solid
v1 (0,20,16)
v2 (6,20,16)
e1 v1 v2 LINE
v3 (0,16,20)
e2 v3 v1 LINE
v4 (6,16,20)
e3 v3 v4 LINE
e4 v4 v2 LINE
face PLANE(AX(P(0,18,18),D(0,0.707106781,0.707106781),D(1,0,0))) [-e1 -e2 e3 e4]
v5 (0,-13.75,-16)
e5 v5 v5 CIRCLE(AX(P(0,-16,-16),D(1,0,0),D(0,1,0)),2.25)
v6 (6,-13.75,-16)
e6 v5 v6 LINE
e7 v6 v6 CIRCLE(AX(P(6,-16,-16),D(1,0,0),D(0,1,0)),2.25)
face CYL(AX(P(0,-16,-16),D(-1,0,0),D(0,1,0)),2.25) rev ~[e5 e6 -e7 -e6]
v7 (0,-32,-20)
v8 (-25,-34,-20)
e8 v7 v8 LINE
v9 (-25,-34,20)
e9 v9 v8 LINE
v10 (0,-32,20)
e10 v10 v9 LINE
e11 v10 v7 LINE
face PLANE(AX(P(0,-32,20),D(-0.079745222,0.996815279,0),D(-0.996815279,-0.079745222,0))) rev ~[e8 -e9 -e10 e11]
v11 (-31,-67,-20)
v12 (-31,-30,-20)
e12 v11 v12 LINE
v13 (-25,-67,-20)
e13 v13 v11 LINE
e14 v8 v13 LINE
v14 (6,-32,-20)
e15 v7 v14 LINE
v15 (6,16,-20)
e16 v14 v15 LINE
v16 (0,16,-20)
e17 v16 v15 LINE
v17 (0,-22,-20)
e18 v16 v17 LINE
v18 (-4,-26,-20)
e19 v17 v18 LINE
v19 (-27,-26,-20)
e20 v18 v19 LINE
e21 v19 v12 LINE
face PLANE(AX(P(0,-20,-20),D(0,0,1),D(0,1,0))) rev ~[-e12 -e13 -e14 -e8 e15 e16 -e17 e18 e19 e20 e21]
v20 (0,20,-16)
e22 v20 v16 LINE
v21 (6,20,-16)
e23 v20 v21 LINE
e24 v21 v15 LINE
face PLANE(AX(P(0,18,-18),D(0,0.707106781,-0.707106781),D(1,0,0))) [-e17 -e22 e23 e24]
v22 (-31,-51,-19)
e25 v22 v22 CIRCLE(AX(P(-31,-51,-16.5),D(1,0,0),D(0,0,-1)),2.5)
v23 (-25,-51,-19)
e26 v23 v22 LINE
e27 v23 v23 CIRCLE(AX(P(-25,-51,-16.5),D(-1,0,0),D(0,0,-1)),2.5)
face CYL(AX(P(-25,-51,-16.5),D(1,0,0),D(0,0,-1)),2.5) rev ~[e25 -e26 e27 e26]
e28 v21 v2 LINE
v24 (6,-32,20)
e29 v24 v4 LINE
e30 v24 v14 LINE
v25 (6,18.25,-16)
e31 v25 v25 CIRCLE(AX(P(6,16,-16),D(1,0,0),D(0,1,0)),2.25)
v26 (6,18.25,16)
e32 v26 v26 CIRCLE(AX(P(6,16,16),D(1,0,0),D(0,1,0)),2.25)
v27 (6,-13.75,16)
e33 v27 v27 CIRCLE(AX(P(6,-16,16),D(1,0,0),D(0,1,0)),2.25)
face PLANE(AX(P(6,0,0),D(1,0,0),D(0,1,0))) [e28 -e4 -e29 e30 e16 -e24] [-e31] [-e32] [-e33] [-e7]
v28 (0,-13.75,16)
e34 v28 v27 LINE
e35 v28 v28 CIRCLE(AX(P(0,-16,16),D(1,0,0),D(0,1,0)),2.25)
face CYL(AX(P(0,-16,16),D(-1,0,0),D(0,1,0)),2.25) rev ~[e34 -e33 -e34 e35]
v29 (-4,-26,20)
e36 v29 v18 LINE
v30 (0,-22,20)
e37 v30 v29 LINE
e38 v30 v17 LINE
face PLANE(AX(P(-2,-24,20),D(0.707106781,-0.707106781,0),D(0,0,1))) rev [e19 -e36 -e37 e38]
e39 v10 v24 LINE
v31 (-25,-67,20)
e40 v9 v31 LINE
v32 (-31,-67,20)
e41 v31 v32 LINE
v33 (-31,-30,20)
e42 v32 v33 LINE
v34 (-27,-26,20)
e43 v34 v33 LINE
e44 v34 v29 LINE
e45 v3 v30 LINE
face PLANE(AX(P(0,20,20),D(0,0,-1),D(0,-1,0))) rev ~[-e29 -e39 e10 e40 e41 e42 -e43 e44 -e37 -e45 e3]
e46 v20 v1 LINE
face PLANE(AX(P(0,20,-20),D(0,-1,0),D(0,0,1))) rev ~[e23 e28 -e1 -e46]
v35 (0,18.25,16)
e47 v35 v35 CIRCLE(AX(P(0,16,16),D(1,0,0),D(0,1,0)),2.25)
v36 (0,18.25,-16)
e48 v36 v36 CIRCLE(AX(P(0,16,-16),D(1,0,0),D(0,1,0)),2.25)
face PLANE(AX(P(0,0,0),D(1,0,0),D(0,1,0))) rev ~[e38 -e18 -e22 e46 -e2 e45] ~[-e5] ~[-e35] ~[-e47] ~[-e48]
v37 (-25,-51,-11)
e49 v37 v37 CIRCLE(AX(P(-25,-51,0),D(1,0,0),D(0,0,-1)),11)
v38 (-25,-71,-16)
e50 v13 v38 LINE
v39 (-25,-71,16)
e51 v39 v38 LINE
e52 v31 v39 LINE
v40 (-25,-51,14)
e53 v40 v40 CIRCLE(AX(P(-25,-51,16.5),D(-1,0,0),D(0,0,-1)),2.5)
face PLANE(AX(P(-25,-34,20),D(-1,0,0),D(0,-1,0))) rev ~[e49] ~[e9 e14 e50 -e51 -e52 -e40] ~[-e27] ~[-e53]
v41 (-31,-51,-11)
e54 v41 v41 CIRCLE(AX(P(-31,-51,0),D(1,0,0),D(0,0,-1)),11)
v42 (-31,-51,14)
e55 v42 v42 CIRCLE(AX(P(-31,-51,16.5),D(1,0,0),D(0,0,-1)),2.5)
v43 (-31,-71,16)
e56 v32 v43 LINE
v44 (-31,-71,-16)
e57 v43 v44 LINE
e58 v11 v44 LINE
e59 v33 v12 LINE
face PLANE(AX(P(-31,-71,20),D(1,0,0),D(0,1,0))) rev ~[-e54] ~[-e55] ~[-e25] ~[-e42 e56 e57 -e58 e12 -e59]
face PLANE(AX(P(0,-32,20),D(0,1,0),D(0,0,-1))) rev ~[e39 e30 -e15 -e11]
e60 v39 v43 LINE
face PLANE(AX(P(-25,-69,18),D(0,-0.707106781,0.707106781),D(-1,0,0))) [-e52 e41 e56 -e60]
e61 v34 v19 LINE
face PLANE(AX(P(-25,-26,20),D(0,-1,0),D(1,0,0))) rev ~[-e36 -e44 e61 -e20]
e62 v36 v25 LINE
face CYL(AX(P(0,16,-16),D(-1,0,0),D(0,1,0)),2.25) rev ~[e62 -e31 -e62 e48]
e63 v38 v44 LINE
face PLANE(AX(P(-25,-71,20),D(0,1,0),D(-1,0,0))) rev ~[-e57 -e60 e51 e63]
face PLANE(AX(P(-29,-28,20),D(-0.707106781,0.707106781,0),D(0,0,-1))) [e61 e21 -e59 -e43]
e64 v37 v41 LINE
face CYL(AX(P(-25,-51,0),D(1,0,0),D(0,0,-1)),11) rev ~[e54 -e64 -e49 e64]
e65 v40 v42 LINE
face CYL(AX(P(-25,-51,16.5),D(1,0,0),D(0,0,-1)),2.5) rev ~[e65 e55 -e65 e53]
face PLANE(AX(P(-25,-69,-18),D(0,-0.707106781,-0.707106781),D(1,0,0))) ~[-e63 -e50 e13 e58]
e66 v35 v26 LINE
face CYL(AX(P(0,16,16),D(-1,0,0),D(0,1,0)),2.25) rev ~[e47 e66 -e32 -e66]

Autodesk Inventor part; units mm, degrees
ref_plane "YZ Plane" through (0, 0, 0) normal (1, 0, 0) x (0, 1, 0)
ref_plane "XZ Plane" through (0, 0, 0) normal (0, 1, 0) x (-1, 0, 0)
ref_plane "XY Plane" through (0, 0, 0) normal (0, 0, 1) x (1, 0, 0)
sketch "Skizze1" plane through (0, 0, 0) normal (1, 0, 0) x (0, 1, 0)
  line L0 (-20, -20) -> (20, -20)
  line L1 (20, -20) -> (20, 20)
  line L2 (20, 20) -> (-20, 20)
  line L3 (-20, 20) -> (-20, -20)
  line L4 (-20, -20) -> (20, 20) construction
  line L5 (20, -20) -> (-20, 20) construction
  line L6 (-16, -16) -> (16, -16) construction
  line L7 (16, -16) -> (16, 16) construction
  line L8 (16, 16) -> (-16, 16) construction
  line L9 (-16, 16) -> (-16, -16) construction
  line L10 (-16, -16) -> (16, 16) construction
  line L11 (16, -16) -> (-16, 16) construction
  circle A0 centre (16, 16) radius 2.25
  circle A1 centre (16, -16) radius 2.25
  circle A2 centre (-16, -16) radius 2.25
  circle A3 centre (-16, 16) radius 2.25
  line L12 (-20, 20) -> (-32, 20)
  line L13 (-32, 20) -> (-32, -20)
  line L14 (-32, -20) -> (-20, -20)
  line L15 (-20, -20) -> (-20, 20)
  point P0 (0, 0)
  dimension "d0" = 40
  dimension "d1" = 40
  dimension "d2" = 32
  dimension "d3" = 32
  dimension "d4" = 4.5
  dimension "d5" = 4.5
  dimension "d6" = 4.5
  dimension "d7" = 4.5
  dimension "d8" = 12
extrude "Extrusion1" add sketch "Skizze1" along normal blind 6
ref_plane "Arbeitsebene1" through (0, -32, 20) normal (0, 0, 1) x (1, 0, 0)
sketch "Skizze2" plane through (0, -32, 20) normal (0, 0, 1) x (1, 0, 0)
  line L0 (0, 52) -> (0, 0) projected
  line L1 (0, 0) -> (6, 0) projected
  line L2 (6, 52) -> (6, 0) projected
  line L3 (0, 52) -> (6, 52) projected
  line L4 (-31, 6) -> (-25, 6)
  line L5 (-25, 6) -> (-25, -39)
  line L6 (-25, -39) -> (-31, -39)
  line L7 (-31, -39) -> (-31, 6)
  line L8 (0, 0) -> (-25, -2)
  line L9 (-25, 6) -> (0, 6)
  point P0 (0, 32)
  point P1 (-28, -39)
  point P2 (-28, 6)
  dimension "d12" = 6
  dimension "d13" = 45
  dimension "d14" = 6
  dimension "d15" = 25
  dimension "d16" = 8
extrude "Extrusion2" add sketch "Skizze2" against normal up to surface (40 mm away) contours L0 L8 L5 L9 | L5 L6 L7 L4
chamfer "Fasen1" distance 4 angle 45 6 edges at (-31, -26, 0) (0, -26, 0) (-28, -71, -20) (-28, -71, 20) (3, 20, -20) (3, 20, 20)
sketch "Skizze3" plane through (-25, -34, 20) normal (1, 0, 0) x (0, 0, -1)
  line L0 (4, -37) -> (0, -33) projected
  line L1 (4, -37) -> (36, -37) projected
  line L2 (40, -33) -> (36, -37) projected
  line L3 (40, 0) -> (40, -33) projected
  line L4 (0, 0) -> (40, 0) projected
  line L5 (0, -33) -> (0, 0) projected
  circle A0 centre (20, -17) radius 20
  circle A1 centre (20, -17) radius 16.5
  point P0 (20, 34)
  dimension "d22" = 33
extrude "Extrusion3" cut sketch "Skizze3" along normal through all contours A1
sketch "Skizze4" plane through (-25, -67, 20) normal (1, 0, 0) x (0, 0, -1)
  line L0 (0, 33) -> (40, 33) projected
  line L1 (0, 0) -> (0, 33) projected
  line L2 (4, -4) -> (0, 0) projected
  line L3 (4, -4) -> (36, -4) projected
  line L4 (40, 0) -> (36, -4) projected
  line L5 (40, 33) -> (40, 0) projected
  circle A0 centre (20, 16) radius 16.5
  circle A1 centre (3.5, 16) radius 2.5
  circle A2 centre (36.5, 16) radius 2.5
  point P0 (20, 67)
  dimension "d25" = 5
  dimension "d26" = 5
extrude "Extrusion4" cut sketch "Skizze4" against normal blind 10 contours A0 A2 | A0 A2 | A1 A0 | A0 A1
sketch "Skizze5" plane through (-25, -67, 20) normal (1, 0, 0) x (0, 0, -1)
  line L0 (0, 35) -> (40, 35) projected
  line L1 (0, 33) -> (0, 35) projected
  line L2 (0, 33) -> (40, 33) projected
  circle A0 centre (20, 16) radius 11
  line L3 (40, 35) -> (40, 33) projected
  point P0 (20, 67)
  dimension "d29" = 22
extrude "Extrusion5" cut sketch "Skizze5" against normal blind 10 contours A0
properties part number "40_XYZstage_micrometer_motorized_nema8_samplemount_angle_distance_24mm"
